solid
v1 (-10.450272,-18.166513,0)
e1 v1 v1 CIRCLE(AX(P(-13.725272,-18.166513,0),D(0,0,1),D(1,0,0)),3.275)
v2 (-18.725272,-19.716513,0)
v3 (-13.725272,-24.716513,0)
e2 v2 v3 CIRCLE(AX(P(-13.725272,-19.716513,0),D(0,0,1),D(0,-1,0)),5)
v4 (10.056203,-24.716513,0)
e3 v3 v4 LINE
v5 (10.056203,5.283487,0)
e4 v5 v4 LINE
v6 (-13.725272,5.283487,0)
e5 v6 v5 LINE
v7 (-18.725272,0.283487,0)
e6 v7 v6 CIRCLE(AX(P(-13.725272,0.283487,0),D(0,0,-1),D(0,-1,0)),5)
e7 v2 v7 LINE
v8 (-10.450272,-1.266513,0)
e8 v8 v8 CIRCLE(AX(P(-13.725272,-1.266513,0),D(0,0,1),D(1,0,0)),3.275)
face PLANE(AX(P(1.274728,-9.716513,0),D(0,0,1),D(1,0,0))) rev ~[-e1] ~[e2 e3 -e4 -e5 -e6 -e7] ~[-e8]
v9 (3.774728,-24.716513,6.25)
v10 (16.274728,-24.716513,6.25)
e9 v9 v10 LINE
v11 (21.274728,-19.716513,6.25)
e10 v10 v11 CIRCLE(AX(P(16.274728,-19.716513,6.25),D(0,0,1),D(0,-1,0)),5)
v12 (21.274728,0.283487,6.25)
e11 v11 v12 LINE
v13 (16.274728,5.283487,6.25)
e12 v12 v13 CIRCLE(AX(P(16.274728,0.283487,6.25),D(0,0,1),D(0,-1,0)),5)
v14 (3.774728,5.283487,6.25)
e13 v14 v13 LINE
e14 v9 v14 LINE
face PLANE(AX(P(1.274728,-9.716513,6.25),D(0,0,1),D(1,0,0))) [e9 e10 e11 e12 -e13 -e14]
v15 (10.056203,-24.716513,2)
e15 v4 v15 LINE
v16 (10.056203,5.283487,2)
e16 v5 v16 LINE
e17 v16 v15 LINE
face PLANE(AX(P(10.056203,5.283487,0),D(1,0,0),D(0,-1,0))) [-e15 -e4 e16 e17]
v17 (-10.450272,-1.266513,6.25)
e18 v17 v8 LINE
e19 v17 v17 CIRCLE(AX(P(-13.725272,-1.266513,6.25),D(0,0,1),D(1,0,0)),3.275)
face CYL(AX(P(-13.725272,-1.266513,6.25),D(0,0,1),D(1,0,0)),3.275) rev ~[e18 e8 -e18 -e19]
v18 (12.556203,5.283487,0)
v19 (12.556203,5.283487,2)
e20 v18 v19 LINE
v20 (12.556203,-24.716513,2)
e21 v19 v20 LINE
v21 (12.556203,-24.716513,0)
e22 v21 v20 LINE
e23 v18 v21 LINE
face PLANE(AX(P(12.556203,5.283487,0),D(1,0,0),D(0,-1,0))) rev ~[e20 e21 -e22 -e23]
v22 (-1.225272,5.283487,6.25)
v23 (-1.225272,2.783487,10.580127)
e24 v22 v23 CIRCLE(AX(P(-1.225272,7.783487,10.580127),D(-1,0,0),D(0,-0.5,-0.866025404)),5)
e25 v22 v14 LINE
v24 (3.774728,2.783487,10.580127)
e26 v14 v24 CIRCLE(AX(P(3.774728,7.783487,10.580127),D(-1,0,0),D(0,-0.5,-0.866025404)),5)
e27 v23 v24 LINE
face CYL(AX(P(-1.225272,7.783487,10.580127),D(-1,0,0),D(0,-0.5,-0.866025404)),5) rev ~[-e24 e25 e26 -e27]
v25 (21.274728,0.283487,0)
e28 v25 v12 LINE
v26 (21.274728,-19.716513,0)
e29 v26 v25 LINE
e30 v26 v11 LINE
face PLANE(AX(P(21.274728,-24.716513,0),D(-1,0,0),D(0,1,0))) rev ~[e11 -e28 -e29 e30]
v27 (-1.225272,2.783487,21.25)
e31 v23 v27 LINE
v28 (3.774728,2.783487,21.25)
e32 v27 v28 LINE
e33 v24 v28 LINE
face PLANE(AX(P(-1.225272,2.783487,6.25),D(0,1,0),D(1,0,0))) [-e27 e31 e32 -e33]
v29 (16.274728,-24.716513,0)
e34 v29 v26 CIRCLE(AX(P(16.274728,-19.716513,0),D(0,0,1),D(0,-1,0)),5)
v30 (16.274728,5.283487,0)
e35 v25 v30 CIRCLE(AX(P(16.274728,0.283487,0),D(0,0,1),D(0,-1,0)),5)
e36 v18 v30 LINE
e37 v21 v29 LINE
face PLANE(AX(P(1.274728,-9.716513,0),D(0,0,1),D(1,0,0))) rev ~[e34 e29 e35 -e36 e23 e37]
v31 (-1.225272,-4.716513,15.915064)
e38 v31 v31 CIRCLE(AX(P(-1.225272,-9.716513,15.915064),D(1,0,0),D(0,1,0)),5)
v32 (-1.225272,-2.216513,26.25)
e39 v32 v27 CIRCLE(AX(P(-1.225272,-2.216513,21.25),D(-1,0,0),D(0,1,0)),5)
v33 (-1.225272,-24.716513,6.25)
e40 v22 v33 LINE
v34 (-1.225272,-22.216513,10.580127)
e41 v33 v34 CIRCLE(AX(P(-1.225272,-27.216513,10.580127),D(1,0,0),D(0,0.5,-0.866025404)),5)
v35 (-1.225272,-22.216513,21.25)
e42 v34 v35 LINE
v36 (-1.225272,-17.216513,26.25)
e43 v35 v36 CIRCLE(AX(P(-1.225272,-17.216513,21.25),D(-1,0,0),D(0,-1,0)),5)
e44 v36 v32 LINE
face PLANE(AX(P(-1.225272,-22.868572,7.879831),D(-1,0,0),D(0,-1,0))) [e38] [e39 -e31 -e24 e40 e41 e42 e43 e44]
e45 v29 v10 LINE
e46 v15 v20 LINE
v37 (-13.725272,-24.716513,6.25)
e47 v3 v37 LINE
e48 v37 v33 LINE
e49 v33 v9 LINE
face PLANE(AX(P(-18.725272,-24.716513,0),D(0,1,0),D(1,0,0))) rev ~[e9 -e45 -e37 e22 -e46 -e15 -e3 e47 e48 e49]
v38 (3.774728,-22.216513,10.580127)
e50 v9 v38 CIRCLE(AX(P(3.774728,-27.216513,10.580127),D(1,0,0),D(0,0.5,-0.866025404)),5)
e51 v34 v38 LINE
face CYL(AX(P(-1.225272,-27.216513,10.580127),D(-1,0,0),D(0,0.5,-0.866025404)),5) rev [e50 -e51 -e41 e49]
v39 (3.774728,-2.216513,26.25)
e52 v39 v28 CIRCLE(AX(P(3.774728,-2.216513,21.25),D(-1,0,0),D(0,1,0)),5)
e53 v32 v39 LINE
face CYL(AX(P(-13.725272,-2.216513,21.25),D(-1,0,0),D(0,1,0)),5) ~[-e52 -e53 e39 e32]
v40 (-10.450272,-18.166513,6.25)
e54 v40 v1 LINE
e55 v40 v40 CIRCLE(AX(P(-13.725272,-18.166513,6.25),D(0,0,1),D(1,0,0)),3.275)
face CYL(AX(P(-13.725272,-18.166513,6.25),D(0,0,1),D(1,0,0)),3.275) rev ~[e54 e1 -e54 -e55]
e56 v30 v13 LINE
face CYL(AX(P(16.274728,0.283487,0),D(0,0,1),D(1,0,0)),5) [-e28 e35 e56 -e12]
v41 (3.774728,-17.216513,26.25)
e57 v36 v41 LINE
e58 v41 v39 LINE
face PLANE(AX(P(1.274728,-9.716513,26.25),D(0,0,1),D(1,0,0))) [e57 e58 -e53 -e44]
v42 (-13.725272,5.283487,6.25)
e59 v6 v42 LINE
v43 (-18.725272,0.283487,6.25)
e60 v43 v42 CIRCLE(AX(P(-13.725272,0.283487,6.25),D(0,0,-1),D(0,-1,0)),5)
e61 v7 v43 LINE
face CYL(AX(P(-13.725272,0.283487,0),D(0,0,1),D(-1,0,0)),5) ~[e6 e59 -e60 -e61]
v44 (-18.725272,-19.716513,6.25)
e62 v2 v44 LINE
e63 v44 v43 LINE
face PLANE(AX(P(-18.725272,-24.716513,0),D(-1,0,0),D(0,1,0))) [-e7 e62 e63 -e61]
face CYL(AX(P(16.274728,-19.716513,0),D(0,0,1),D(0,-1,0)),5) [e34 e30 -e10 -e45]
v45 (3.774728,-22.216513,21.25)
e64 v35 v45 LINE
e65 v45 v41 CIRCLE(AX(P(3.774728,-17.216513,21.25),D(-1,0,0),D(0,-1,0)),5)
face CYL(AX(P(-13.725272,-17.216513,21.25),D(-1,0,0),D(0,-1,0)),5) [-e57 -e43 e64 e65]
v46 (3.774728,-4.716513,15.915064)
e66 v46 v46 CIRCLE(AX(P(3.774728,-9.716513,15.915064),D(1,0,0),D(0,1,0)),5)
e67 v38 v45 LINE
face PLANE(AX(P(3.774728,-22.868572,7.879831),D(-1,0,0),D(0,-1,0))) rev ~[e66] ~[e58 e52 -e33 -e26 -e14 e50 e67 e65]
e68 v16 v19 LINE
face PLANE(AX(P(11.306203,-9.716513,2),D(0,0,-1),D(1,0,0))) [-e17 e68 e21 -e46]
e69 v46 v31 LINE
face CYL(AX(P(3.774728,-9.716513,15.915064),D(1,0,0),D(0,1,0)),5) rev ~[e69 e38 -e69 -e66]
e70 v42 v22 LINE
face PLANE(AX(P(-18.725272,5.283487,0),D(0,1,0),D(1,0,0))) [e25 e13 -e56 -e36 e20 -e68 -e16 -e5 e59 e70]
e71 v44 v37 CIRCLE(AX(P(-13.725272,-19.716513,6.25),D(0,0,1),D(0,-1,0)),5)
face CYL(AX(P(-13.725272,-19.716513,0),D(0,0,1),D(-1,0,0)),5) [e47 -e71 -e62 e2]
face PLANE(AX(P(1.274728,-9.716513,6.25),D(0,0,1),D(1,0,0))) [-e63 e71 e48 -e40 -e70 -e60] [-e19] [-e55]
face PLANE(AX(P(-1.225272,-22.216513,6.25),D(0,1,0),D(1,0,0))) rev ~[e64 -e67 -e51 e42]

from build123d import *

# Parameters (mm, degrees)
F0_W        = 40
F0_H        = 30
F1_DEPTH    = 6.25
F2_R        = 5
F3_W        = 5
F3_H        = 25
F4_DEPTH    = 20
F5_T1_DEPTH = 5
F5_T3_DEPTH = 5
F5_T5_DEPTH = 30
F5_T7_DEPTH = 30
F7_R        = 5
F8_DEPTH    = 5
F6_R        = 3.275
F9_DEPTH    = 25
F10_W       = 2.5
F10_H       = 30
F11_DEPTH   = 2


# Not quite as in the source:
# - a fillet or chamfer that OpenCascade refuses, or shapes differently, is made with other operations: its cross-section is extruded or revolved along the edge and cut away or added


with BuildPart() as f1:
    # F0 (on Top) → F1 (new body)
    with BuildSketch(Plane.XY):
        with Locations((1.2747282162, -9.7165126197)):
            Rectangle(F0_W, F0_H)
    extrude(amount=F1_DEPTH)

    # F2
    f2_edges = [f1.edges().sort_by_distance(p)[0] for p in [
        (-18.725272, -24.716513, 3.125),
        (21.274728, -24.716513, 3.125),
        (21.274728, 5.283487, 3.125),
        (-18.725272, 5.283487, 3.125),
    ]]
    fillet(f2_edges, radius=F2_R)

    # F3 (on face) → F4 (join)
    with BuildSketch(Plane.XY.offset(6.25)):
        with Locations((1.2747282162, -9.7165126197)):
            Rectangle(F3_W, F3_H)
    extrude(amount=F4_DEPTH)

    # F5: fillet of radius 5 on 4 edges, made by hand

    # F5_s2 → F5_t1 (join)
    with BuildSketch(Plane.YZ.offset(-1.2252717838)):
        with BuildLine():
            ThreePointArc((5.2834873803, 6.25), (3.4533603614, 8.0801270189), (2.7834873803, 10.5801270189))
            Line((2.7834873803, 10.5801270189), (2.7834873803, 6.25))
            Line((2.7834873803, 6.25), (5.2834873803, 6.25))
        make_face()
    extrude(amount=F5_T1_DEPTH)

    # F5_s4 → F5_t3 (join)
    with BuildSketch(Plane.YZ.offset(-1.2252717838)):
        with BuildLine():
            ThreePointArc((-24.7165126197, 6.25), (-22.8863856008, 8.0801270189), (-22.2165126197, 10.5801270189))
            Line((-22.2165126197, 10.5801270189), (-22.2165126197, 6.25))
            Line((-22.2165126197, 6.25), (-24.7165126197, 6.25))
        make_face()
    extrude(amount=F5_T3_DEPTH)

    # F5_s6 → F5_t5 (cut)
    with BuildSketch(Plane.YZ.offset(-13.7252717838)):
        with BuildLine():
            ThreePointArc((2.7834873803, 21.25), (1.3190212862, 24.7855339059), (-2.2165126197, 26.25))
            Line((-2.2165126197, 26.25), (2.7834873803, 26.25))
            Line((2.7834873803, 26.25), (2.7834873803, 21.25))
        make_face()
    extrude(amount=F5_T5_DEPTH, mode=Mode.SUBTRACT)

    # F5_s8 → F5_t7 (cut)
    with BuildSketch(Plane.YZ.offset(-13.7252717838)):
        with BuildLine():
            ThreePointArc((-22.2165126197, 21.25), (-20.7520465256, 24.7855339059), (-17.2165126197, 26.25))
            Line((-17.2165126197, 26.25), (-22.2165126197, 26.25))
            Line((-22.2165126197, 26.25), (-22.2165126197, 21.25))
        make_face()
    extrude(amount=F5_T7_DEPTH, mode=Mode.SUBTRACT)

    # F7 (on face) → F8 (cut)
    with BuildSketch(Plane.YZ.offset(3.7747282162)):
        with Locations((-9.7165126197, 15.9150635095)):
            Circle(F7_R)
    extrude(amount=-F8_DEPTH, mode=Mode.SUBTRACT)

    # F6 (on face) → F9 (cut)
    with BuildSketch(Plane.XY.offset(6.25)):
        with Locations((-13.7252717838, -1.2665126197)):
            Circle(F6_R)
        with Locations((-13.7252717838, -18.1665126197)):
            Circle(F6_R)
    extrude(amount=-F9_DEPTH, mode=Mode.SUBTRACT)

    # F10 (on face) → F11 (cut)
    with BuildSketch(Plane(origin=(0, 0, 0), x_dir=(1, 0, 0), z_dir=(0, 0, -1))):
        with Locations((11.3062032312, 9.7165126197)):
            Rectangle(F10_W, F10_H)
    extrude(amount=-F11_DEPTH, mode=Mode.SUBTRACT)


solid = f1.part
